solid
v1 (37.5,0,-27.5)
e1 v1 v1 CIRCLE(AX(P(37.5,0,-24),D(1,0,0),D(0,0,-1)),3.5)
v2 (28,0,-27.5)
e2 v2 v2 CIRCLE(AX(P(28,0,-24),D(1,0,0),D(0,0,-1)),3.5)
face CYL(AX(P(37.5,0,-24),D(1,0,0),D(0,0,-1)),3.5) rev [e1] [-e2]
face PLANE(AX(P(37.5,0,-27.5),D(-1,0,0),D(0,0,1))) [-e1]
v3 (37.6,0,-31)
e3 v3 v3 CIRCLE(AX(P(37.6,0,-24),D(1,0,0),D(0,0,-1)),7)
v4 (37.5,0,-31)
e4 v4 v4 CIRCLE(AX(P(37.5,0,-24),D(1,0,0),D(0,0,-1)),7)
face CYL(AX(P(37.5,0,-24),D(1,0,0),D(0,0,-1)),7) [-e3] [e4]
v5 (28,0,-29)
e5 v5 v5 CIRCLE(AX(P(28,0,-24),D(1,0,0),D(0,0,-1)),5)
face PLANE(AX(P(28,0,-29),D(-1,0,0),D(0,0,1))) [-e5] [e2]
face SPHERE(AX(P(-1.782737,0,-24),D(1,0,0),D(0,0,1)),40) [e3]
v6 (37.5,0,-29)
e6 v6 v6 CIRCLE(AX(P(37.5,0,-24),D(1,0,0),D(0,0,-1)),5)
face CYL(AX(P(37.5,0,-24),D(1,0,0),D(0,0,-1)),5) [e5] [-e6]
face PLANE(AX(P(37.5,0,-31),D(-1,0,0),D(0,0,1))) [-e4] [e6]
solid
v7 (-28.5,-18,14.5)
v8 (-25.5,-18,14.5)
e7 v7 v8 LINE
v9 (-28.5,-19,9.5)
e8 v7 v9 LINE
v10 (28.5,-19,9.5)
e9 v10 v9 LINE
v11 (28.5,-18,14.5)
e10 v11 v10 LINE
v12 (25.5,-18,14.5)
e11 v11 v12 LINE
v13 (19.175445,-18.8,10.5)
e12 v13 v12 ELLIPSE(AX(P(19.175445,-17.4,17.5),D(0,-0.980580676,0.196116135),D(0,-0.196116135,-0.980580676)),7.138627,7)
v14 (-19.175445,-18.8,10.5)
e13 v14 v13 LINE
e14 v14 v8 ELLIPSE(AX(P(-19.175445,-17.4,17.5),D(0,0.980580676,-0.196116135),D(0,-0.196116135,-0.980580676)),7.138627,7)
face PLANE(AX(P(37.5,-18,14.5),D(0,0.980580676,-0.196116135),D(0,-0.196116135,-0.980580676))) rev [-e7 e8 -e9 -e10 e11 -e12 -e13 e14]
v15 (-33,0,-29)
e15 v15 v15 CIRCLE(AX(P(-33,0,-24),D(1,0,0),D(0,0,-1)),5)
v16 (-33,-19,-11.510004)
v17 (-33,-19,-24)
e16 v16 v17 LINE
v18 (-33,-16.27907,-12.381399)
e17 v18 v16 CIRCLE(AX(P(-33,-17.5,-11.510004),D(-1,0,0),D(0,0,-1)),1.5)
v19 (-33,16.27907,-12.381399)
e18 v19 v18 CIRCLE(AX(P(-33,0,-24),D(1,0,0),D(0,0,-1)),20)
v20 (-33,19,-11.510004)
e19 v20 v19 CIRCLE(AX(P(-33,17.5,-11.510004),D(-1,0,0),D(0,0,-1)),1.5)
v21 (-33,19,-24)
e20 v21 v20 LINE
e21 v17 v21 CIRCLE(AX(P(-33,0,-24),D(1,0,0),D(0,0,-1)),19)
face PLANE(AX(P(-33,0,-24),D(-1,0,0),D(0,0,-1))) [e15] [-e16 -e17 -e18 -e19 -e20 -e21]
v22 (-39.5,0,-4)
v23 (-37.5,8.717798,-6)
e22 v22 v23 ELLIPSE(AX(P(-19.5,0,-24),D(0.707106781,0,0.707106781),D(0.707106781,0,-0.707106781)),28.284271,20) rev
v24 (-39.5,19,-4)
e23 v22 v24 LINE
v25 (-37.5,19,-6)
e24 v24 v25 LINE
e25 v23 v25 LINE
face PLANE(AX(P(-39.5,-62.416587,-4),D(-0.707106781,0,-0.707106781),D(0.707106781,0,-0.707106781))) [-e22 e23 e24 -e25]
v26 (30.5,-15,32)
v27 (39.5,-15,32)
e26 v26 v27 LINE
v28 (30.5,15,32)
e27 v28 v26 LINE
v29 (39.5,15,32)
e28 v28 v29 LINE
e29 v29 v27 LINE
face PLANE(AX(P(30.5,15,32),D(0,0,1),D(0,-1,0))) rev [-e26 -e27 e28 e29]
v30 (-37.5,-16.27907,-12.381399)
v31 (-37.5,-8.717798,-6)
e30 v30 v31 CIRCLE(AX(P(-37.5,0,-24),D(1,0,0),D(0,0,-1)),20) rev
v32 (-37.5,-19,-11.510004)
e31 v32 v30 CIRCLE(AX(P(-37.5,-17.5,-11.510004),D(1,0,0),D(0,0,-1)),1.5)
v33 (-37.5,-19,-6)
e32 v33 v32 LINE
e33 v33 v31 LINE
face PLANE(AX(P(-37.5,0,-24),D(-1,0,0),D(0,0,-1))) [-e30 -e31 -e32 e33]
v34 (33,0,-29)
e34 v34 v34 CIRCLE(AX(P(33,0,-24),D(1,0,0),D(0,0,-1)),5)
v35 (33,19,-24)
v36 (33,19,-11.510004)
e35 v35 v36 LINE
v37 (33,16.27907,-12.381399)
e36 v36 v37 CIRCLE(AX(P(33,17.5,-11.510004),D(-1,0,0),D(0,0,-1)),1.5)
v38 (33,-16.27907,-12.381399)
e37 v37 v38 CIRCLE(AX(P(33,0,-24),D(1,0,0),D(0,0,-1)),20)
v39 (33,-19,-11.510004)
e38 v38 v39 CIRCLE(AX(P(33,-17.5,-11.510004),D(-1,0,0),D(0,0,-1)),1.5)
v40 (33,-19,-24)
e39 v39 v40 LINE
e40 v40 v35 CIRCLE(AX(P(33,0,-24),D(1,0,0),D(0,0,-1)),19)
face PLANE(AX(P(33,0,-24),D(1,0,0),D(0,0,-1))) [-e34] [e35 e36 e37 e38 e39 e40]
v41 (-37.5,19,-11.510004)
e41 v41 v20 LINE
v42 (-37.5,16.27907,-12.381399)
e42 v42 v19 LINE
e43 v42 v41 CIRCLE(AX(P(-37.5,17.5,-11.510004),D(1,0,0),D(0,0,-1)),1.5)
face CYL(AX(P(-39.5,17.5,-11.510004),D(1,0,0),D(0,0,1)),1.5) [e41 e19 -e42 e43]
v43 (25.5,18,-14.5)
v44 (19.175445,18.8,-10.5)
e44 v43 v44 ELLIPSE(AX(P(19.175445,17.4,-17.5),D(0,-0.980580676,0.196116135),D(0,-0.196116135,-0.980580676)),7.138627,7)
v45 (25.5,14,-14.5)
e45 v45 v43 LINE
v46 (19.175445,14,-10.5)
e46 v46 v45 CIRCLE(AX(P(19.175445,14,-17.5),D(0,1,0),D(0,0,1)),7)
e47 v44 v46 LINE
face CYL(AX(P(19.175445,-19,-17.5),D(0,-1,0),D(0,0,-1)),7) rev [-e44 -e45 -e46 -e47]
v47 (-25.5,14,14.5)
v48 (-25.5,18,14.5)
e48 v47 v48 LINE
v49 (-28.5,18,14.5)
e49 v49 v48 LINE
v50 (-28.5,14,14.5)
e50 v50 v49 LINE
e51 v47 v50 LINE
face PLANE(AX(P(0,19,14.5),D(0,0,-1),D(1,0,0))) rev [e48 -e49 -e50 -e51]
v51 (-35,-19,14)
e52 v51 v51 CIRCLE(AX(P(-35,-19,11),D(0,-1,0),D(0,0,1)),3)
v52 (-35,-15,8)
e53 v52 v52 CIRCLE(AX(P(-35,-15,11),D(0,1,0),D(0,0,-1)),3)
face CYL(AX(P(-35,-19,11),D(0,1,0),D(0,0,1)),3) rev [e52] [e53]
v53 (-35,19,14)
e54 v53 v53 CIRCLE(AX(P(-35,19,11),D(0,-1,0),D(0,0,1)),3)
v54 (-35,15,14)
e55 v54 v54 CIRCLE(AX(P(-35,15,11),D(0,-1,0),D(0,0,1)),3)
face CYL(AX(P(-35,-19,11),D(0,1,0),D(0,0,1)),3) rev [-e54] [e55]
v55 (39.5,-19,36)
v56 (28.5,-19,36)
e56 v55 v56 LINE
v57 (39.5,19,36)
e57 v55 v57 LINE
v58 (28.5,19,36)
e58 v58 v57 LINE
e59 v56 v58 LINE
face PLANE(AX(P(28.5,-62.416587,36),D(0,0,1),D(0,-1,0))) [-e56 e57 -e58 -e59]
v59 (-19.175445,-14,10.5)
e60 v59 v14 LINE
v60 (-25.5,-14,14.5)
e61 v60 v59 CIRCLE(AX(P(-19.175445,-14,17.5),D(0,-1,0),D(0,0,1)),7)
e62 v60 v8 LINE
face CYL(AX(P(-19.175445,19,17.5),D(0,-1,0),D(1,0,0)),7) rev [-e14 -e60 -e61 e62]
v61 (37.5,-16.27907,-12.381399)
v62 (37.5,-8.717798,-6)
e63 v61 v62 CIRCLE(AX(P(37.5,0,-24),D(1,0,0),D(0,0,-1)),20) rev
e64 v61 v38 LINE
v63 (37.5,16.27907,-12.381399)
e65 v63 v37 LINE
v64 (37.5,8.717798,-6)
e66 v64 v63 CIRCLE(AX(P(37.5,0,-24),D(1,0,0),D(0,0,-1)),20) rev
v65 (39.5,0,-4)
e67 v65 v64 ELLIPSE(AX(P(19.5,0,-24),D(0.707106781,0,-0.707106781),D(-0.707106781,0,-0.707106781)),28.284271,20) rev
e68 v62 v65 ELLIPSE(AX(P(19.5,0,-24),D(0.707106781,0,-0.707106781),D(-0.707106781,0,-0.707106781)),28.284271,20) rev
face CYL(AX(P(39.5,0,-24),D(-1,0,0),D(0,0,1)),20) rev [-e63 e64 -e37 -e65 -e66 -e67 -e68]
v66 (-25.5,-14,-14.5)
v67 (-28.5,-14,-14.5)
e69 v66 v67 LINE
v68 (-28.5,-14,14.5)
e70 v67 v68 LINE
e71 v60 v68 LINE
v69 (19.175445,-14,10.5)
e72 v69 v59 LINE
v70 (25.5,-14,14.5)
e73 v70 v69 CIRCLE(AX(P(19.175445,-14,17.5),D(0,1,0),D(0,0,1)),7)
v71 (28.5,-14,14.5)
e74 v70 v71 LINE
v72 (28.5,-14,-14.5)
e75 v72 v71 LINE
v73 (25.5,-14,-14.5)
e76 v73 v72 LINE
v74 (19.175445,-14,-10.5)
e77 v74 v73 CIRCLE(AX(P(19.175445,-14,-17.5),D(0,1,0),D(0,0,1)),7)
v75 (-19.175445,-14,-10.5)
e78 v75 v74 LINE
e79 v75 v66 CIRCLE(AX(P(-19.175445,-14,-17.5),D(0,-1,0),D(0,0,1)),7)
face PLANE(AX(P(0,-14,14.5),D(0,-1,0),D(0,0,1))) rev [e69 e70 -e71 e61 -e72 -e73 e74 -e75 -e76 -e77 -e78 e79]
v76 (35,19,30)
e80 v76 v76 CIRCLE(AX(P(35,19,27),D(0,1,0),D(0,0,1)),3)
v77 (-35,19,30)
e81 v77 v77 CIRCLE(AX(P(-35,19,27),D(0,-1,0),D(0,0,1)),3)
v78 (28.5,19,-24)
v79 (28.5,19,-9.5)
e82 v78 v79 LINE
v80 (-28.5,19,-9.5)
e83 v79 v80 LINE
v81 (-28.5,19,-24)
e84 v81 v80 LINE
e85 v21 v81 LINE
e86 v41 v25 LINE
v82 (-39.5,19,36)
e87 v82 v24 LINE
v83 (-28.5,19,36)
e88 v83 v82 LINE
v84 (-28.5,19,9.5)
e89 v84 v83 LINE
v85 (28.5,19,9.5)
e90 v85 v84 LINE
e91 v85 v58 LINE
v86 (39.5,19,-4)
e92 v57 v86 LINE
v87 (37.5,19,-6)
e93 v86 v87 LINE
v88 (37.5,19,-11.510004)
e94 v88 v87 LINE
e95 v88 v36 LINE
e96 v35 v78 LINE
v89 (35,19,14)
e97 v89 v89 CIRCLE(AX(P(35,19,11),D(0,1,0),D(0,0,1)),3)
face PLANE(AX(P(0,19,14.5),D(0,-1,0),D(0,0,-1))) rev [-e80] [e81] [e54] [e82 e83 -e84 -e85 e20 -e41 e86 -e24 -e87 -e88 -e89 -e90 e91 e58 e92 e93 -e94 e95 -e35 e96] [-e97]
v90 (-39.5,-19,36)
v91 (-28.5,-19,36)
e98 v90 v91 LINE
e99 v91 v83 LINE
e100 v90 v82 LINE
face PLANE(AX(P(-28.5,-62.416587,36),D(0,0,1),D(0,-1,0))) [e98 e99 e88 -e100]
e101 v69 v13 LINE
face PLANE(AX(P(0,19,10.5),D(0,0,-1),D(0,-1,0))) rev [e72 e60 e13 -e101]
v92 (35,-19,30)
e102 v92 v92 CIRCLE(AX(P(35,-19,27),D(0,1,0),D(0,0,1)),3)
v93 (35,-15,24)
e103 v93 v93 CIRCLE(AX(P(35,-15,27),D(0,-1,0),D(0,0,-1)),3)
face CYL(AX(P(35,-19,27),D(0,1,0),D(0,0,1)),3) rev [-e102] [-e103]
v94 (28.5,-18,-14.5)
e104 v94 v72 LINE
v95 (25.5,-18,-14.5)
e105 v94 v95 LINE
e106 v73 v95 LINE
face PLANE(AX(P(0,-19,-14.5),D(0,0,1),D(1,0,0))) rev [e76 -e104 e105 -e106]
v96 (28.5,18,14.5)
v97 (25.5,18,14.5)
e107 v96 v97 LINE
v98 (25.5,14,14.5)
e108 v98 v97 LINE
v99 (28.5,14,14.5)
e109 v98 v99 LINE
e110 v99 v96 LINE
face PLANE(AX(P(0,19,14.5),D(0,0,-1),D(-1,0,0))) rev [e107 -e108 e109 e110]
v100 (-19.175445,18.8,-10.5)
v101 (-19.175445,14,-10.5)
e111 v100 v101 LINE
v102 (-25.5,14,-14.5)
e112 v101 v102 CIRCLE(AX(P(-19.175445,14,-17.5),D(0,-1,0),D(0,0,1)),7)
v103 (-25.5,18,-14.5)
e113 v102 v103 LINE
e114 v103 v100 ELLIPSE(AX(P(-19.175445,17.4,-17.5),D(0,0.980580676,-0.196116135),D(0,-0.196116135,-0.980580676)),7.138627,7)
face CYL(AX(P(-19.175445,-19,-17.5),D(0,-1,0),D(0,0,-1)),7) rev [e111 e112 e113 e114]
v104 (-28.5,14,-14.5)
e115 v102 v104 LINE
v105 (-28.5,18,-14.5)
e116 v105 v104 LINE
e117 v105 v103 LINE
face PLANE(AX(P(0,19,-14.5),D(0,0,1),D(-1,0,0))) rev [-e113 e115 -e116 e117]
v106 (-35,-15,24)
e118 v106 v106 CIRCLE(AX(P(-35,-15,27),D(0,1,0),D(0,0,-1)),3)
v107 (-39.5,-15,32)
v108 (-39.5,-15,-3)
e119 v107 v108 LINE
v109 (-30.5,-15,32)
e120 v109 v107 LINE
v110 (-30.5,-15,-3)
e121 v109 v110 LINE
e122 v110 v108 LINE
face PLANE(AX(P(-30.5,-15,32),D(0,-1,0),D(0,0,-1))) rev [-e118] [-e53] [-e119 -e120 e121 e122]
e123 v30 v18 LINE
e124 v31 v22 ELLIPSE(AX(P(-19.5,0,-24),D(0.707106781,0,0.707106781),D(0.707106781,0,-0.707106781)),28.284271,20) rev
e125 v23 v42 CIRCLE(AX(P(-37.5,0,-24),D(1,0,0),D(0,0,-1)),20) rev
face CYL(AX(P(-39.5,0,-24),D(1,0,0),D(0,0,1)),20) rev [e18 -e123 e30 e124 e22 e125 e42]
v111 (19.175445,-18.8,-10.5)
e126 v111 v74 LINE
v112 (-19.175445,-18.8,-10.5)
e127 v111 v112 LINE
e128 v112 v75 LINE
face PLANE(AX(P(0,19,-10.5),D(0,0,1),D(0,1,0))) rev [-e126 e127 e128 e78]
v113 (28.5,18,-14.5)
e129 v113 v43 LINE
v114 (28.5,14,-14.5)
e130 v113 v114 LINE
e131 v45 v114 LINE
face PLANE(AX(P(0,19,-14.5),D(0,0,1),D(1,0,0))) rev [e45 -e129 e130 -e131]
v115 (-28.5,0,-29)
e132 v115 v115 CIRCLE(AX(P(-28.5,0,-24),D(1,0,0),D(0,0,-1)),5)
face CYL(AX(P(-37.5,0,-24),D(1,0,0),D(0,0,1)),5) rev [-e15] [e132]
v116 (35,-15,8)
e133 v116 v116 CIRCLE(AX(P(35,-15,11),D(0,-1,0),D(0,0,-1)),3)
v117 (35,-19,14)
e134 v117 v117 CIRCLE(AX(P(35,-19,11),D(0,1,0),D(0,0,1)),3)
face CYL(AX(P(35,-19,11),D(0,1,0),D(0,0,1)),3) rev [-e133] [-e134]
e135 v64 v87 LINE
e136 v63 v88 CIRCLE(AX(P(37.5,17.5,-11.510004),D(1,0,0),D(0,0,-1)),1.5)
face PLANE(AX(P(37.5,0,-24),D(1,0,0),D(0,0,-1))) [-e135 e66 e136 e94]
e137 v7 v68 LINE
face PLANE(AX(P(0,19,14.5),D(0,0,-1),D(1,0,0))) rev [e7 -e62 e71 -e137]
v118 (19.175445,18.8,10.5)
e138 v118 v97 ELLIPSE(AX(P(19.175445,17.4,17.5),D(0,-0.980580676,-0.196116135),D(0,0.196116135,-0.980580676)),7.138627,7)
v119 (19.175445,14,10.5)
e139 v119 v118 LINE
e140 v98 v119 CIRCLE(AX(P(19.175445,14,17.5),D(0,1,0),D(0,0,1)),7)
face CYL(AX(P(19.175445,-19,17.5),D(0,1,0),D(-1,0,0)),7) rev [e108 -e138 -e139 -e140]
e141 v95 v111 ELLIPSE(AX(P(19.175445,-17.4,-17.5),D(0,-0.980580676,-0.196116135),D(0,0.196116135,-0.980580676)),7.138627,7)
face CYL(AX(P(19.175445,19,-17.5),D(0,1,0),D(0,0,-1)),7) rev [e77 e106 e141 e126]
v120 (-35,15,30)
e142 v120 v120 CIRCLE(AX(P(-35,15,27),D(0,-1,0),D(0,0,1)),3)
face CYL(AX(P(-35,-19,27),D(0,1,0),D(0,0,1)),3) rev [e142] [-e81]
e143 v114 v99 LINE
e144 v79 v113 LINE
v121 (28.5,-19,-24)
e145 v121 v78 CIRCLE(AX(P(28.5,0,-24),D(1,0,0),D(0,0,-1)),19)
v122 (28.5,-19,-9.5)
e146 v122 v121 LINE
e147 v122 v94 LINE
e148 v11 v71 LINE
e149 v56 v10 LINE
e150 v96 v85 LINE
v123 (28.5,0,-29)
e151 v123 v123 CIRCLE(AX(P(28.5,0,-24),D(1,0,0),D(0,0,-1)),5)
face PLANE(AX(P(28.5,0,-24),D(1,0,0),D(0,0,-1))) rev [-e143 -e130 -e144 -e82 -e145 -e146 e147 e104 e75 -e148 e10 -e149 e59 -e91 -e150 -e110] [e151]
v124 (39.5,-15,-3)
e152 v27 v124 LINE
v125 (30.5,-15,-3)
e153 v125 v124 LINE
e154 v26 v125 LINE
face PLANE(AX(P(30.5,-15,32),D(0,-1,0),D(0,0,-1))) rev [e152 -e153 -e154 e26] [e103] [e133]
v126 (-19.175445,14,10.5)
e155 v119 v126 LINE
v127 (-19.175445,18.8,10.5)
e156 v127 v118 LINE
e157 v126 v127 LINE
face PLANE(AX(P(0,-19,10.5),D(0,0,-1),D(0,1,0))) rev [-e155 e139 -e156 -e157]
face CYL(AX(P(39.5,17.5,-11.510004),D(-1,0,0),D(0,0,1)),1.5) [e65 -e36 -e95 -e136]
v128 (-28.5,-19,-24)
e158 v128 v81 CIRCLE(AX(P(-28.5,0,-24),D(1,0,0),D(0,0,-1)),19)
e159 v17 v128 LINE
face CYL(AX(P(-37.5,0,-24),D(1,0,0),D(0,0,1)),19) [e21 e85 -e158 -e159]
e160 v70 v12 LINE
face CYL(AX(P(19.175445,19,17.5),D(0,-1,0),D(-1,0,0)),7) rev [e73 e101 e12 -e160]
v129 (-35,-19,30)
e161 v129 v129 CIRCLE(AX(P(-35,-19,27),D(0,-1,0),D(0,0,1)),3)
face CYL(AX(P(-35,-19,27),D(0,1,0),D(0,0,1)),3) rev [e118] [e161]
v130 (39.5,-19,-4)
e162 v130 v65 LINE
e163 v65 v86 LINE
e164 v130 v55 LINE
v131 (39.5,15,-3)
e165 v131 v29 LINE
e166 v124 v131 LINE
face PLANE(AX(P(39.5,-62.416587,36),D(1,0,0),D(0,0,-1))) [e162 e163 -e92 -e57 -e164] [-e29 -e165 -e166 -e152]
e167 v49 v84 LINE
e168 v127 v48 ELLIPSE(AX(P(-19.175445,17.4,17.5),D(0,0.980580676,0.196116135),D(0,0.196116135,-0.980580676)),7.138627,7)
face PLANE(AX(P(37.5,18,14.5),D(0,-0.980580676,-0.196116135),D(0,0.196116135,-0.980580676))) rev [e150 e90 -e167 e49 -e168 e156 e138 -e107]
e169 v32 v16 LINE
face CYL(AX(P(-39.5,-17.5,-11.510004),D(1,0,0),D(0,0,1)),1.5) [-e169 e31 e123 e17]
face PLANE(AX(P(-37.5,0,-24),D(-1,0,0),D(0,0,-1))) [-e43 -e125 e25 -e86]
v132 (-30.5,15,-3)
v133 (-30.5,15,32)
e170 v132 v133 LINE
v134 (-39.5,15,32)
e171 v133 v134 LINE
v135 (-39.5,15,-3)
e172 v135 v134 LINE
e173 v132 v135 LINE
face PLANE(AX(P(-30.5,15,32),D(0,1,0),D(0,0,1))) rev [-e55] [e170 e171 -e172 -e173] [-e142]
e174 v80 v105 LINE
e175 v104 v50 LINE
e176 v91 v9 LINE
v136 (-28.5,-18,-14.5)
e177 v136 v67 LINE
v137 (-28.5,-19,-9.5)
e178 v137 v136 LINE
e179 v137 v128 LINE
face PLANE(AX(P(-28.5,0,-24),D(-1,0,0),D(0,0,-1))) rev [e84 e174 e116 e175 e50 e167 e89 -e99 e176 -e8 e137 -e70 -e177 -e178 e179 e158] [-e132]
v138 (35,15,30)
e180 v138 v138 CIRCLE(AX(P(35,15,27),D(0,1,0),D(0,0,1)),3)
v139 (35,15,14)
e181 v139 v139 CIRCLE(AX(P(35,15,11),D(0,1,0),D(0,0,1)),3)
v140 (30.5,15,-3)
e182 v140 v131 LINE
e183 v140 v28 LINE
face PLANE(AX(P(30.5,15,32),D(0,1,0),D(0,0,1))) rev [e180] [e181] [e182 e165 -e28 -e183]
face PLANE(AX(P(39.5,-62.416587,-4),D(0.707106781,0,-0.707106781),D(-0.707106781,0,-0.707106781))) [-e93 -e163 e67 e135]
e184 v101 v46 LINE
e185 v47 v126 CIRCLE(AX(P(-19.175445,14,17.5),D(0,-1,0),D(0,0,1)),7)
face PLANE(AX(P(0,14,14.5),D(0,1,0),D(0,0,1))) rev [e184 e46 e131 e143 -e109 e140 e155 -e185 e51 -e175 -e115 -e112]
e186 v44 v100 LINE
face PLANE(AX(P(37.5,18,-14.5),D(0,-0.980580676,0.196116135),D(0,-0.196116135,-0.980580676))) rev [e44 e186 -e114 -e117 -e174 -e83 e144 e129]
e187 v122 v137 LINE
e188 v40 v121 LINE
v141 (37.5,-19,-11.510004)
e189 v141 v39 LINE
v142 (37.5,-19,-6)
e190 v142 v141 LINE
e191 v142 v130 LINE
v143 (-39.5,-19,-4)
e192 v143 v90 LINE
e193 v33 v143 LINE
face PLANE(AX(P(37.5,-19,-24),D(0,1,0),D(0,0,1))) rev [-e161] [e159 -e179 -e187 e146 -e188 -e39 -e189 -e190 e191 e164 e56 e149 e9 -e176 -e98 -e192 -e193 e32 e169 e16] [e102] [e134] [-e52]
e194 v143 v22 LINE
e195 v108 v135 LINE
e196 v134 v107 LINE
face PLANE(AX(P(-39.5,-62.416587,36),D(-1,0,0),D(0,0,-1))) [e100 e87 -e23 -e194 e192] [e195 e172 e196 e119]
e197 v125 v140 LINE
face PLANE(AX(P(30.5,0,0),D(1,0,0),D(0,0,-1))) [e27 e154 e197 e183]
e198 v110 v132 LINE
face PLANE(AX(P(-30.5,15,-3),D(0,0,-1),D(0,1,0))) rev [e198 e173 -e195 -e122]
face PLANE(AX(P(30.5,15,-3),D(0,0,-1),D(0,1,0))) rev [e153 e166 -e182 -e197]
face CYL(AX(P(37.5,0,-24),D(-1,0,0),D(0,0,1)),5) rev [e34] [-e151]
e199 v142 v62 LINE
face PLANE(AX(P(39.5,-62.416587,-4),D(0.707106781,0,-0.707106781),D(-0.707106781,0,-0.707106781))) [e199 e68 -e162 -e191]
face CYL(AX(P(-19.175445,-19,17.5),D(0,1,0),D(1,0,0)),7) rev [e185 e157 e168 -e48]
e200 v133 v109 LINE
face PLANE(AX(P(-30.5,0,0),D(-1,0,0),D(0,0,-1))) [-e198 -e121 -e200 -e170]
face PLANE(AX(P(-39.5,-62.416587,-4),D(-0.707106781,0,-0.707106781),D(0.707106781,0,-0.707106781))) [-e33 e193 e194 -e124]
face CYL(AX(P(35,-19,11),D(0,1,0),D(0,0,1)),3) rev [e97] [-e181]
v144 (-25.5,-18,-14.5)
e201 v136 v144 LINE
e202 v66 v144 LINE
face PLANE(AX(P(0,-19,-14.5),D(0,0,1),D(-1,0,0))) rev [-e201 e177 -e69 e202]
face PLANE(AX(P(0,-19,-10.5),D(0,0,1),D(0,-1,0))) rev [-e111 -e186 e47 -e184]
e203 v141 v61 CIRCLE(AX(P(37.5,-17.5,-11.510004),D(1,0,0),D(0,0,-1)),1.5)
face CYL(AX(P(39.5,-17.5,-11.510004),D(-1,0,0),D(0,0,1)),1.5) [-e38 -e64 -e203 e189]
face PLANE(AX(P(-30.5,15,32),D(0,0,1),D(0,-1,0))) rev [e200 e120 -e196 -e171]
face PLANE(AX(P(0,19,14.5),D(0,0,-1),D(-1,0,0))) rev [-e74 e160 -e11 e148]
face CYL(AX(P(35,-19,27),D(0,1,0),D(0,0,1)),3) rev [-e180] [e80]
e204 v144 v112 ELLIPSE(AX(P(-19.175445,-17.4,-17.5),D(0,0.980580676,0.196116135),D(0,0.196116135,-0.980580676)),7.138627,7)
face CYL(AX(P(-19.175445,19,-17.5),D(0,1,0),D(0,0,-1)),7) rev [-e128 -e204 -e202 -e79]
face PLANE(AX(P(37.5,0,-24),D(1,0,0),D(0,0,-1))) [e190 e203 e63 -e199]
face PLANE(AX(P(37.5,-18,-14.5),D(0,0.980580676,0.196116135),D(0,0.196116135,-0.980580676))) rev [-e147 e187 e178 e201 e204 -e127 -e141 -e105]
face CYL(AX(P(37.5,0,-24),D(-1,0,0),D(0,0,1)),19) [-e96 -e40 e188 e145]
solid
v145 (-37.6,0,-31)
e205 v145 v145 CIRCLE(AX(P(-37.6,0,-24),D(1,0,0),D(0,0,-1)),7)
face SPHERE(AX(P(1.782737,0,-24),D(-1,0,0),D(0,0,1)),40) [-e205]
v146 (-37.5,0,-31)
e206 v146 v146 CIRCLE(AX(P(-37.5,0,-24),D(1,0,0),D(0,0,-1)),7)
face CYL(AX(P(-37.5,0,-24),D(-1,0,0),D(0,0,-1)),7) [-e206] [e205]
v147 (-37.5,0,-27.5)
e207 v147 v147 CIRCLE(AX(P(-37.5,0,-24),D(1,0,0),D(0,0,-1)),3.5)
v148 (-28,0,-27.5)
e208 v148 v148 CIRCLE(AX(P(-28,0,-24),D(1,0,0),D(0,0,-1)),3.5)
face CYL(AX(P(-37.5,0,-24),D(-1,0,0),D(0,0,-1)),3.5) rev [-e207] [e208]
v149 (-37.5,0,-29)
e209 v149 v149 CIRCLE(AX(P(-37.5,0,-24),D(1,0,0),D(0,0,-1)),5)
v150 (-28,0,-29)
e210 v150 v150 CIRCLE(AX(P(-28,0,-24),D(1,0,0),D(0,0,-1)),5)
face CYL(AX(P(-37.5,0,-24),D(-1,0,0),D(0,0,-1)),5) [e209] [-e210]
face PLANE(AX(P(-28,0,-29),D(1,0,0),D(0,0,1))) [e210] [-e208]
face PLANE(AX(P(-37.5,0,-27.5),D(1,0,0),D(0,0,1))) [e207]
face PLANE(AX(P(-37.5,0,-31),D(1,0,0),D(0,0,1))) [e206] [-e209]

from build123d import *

# Parameters (mm, degrees)
BOSS_EXTRUDE1_START     = 28.5
BOSS_EXTRUDE1_DEPTH     = 9
CUT_EXTRUDE1_DEPTH      = 4.5
SKETCH3_R               = 5
CUT_EXTRUDE2_DEPTH      = 48.22552276
CIRPATTERN1_START       = 28.5
CIRPATTERN1_DEPTH       = 4.5
CIRPATTERN1_START_2     = 33
CIRPATTERN1_2_OUTLINE_R = 5
CIRPATTERN1_2_DEPTH     = 4.5
SKETCH4_W               = 29
SKETCH4_H               = 5
BOSS_EXTRUDE2_DEPTH     = 28.5
CUT_EXTRUDE3_DEPTH      = 61.135264197
SKETCH6_W               = 25.5
SKETCH6_H               = 4
CUT_EXTRUDE4_DEPTH      = 69.551075849
FILLET1_R               = 7
CUT_EXTRUDE5_DEPTH      = 69.946059827
BOSS_EXTRUDE3_DEPTH     = 38
SKETCH10_W              = 35
SKETCH10_H              = 30
CUT_EXTRUDE7_DEPTH      = 9
SKETCH11_R              = 3
CUT_EXTRUDE8_DEPTH      = 70.665271118
SKETCH14_R              = 5
BOSS_EXTRUDE4_DEPTH     = 4.5
CUT_EXTRUDE9_DEPTH      = 90.124092509
CUT_EXTRUDE9_DEPTH_BACK = 4.5
SKETCH12_R              = 5


# Read off the part's stored shape, not the designer's step: CirPattern1
with BuildPart() as part:
    # Sketch1 → Boss-Extrude1 (new body)
    with BuildSketch(Plane(origin=(0, 0, 0), x_dir=(0, 0, -1), z_dir=(1, 0, 0)).offset(BOSS_EXTRUDE1_START)):
        with BuildLine():
            Line((24, -19), (-24, -19))
            ThreePointArc((-24, -19), (-43, 0), (-24, 19))
            Line((-24, 19), (24, 19))
            ThreePointArc((24, 19), (43, 0), (24, -19))
        make_face()
    extrude(amount=BOSS_EXTRUDE1_DEPTH)

    # Sketch2 → Cut-Extrude1 (cut)
    with BuildSketch(Plane(origin=(37.5, 0, 0), x_dir=(0, 0, -1), z_dir=(1, 0, 0))):
        with BuildLine():
            Line((-11.510004003, -19), (24, -19))
            Line((24, -19), (24, -42.915105585))
            Line((24, -42.915105585), (-69.339300191, -42.915105585))
            Line((-69.339300191, -42.915105585), (-69.339300191, 41.365624017))
            Line((-69.339300191, 41.365624017), (24, 41.365624017))
            Line((24, 41.365624017), (24, 19))
            Line((24, 19), (-11.510004003, 19))
            ThreePointArc((-11.510004003, 19), (-12.938533903, 17.957495711), (-12.381399073, 16.279069767))
            ThreePointArc((-12.381399073, 16.279069767), (-4, 0), (-12.381399073, -16.279069767))
            ThreePointArc((-12.381399073, -16.279069767), (-12.938533903, -17.957495711), (-11.510004003, -19))
        make_face()
    extrude(amount=-CUT_EXTRUDE1_DEPTH, mode=Mode.SUBTRACT)

    # Sketch3 → Cut-Extrude2 (cut, through all)
    with BuildSketch(Plane(origin=(33, 0, 0), x_dir=(0, 0, -1), z_dir=(1, 0, 0))):
        with Locations((-24, 0)):
            Circle(SKETCH3_R)
    extrude(amount=-CUT_EXTRUDE2_DEPTH, mode=Mode.SUBTRACT)

    # CirPattern1 outline → CirPattern1 (cut)
    with BuildSketch(Plane.YZ.offset(CIRPATTERN1_START)):
        with BuildLine():
            ThreePointArc((16.279069767, -12.381399073), (0, -4), (-16.279069767, -12.381399073))
            ThreePointArc((-16.279069767, -12.381399073), (-17.957495711, -12.938533903), (-19, -11.510004003))
            Line((-19, -11.510004003), (-19, -24))
            ThreePointArc((-19, -24), (0, -43), (19, -24))
            Line((19, -24), (19, -11.510004003))
            ThreePointArc((19, -11.510004003), (17.957495711, -12.938533903), (16.279069767, -12.381399073))
        make_face()
    extrude(amount=CIRPATTERN1_DEPTH, mode=Mode.SUBTRACT)

    # CirPattern1 2 outline → CirPattern1 2 (cut)
    with BuildSketch(Plane.YZ.offset(CIRPATTERN1_START_2)):
        with Locations((0, -24)):
            Circle(CIRPATTERN1_2_OUTLINE_R)
    extrude(amount=CIRPATTERN1_2_DEPTH, mode=Mode.SUBTRACT)


with BuildPart() as body_2:
    # Sketch4 → Boss-Extrude2 (new body)
    with BuildSketch(Plane.ZY.offset(-28.5)):
        with Locations((0, 16.5)):
            Rectangle(SKETCH4_W, SKETCH4_H)
    extrude(amount=BOSS_EXTRUDE2_DEPTH)

    # Sketch5 → Cut-Extrude3 (cut, through all)
    with BuildSketch(Plane.ZY):
        Polygon((-9.5, 19), (-14.5, 19), (-14.5, 18), align=None)
        Polygon((14.5, 18), (9.5, 19), (14.5, 19), align=None)
    extrude(amount=-CUT_EXTRUDE3_DEPTH, mode=Mode.SUBTRACT)

    # Sketch6 → Cut-Extrude4 (cut, through all)
    with BuildSketch(Plane(origin=(0, 19, 0), x_dir=(1, 0, 0), z_dir=(0, 1, 0))):
        with Locations((12.75, 12.5)):
            Rectangle(SKETCH6_W, SKETCH6_H)
        with Locations((12.75, -12.5)):
            Rectangle(SKETCH6_W, SKETCH6_H)
    extrude(amount=-CUT_EXTRUDE4_DEPTH, mode=Mode.SUBTRACT)

    # Fillet1
    # the kernel refuses this fillet: 7 mm, written as the material it adds along each edge
    with BuildSketch(Plane(origin=(25.5, 34.611388301, -10.5), x_dir=(0, 0, -1), z_dir=(0, -1, 0))) as fillet1_piece_1_section:
        with BuildLine():
            CenterArc((7, -6.32455532), FILLET1_R, 115.376933525, 64.623066475)
            Line((0, -6.32455532), (-0.14, -6.32455532))
            Line((-0.14, -6.32455532), (-0.14, 0))
            Line((-0.14, 0), (0, 0.14))
            ThreePointArc((0, 0.14), (2, 0.14), (3.94, 0.126491106))
            Line((3.94, 0.126491106), (4, 0))
        make_face()
    fillet1_piece_1 = extrude(amount=20.611388301, mode=Mode.PRIVATE)
    fillet1_piece_1 = split(fillet1_piece_1, bisect_by=Plane(origin=(23.914802674, 18.512286415, -11.938567923), z_dir=(0, -0.9805806756909202, 0.1961161351381841)), keep=Keep.TOP, mode=Mode.PRIVATE)
    add(fillet1_piece_1)
    with BuildSketch(Plane(origin=(25.5, 34.611388301, 10.5), x_dir=(-1, 0, 0), z_dir=(0, -1, 0))) as fillet1_piece_2_section:
        with BuildLine():
            CenterArc((6.32455532, -7), FILLET1_R, 90, 64.623066475)
            Line((0, -4), (-0.126491106, -3.94))
            ThreePointArc((-0.126491106, -3.94), (-0.14, -2), (-0.14, 0))
            Line((-0.14, 0), (0, 0.14))
            Line((0, 0.14), (6.32455532, 0.14))
            Line((6.32455532, 0.14), (6.32455532, 0))
        make_face()
    fillet1_piece_2 = extrude(amount=20.611388301, mode=Mode.PRIVATE)
    fillet1_piece_2 = split(fillet1_piece_2, bisect_by=Plane(origin=(23.914802674, 18.512286415, 11.938567923), z_dir=(0, -0.9805806756909202, -0.1961161351381841)), keep=Keep.TOP, mode=Mode.PRIVATE)
    add(fillet1_piece_2)


with BuildPart() as body_3:
    # Mirror1: mirrored copy
    add(body_2.part.mirror(Plane.ZX))


with BuildPart() as body_2_1:
    add(body_2.part)

    # Combine1: union part, body 3
    add(part.part)
    add(body_3.part)

    # Mirror2: body 2 across plane


with BuildPart() as body_2_2:
    add(body_2_1.part)
    add(body_2_1.part.mirror(Plane(origin=(0, 0, 0), x_dir=(0, 0, 1), z_dir=(1, 0, 0))))

    # Sketch9 → Cut-Extrude5 (cut, through all)
    with BuildSketch(Plane(origin=(0, 19, 0), x_dir=(1, 0, 0), z_dir=(0, 1, 0))):
        Polygon((-50.684175345, 49.546643659), (0, 49.546643659), (0, -14.5), (47.40252606, -14.5), (47.40252606, -48.723397375), (0, -48.723397375), (-50.684175345, -48.723397375), align=None)
    extrude(amount=-CUT_EXTRUDE5_DEPTH, mode=Mode.SUBTRACT)

    # Sketch8 → Boss-Extrude3 (add)
    with BuildSketch(Plane(origin=(0, 19, 0), x_dir=(1, 0, 0), z_dir=(0, 1, 0))):
        Polygon((39.5, 4), (37.5, 6), (33.584622935, 6), (33.584622935, 3.307606204), (28.5, 3.307606204), (28.5, -36), (39.5, -36), align=None)
    extrude(amount=-BOSS_EXTRUDE3_DEPTH)

    # Sketch10 → Cut-Extrude7 (cut)
    with BuildSketch(Plane(origin=(39.5, 0, 0), x_dir=(0, 0, -1), z_dir=(1, 0, 0))):
        with Locations((-14.5, 0)):
            Rectangle(SKETCH10_W, SKETCH10_H)
    extrude(amount=-CUT_EXTRUDE7_DEPTH, mode=Mode.SUBTRACT)

    # Sketch11 → Cut-Extrude8 (cut, through all)
    with BuildSketch(Plane(origin=(0, 19, 0), x_dir=(1, 0, 0), z_dir=(0, 1, 0))):
        with Locations(Location((35, -27, 0), (0, 0, 270))):
            Circle(SKETCH11_R)
        with Locations(Location((35, -11, 0), (0, 0, 270))):
            Circle(SKETCH11_R)
    extrude(amount=-CUT_EXTRUDE8_DEPTH, mode=Mode.SUBTRACT)

    # Sketch14 → Boss-Extrude4 (add)
    with BuildSketch(Plane.ZY.offset(-33)):
        with BuildLine():
            Line((-24, -19), (-11.510004003, -19))
            ThreePointArc((-11.510004003, -19), (-12.938533903, -17.957495711), (-12.381399073, -16.279069767))
            ThreePointArc((-12.381399073, -16.279069767), (-4, 0), (-12.381399073, 16.279069767))
            ThreePointArc((-12.381399073, 16.279069767), (-12.938533903, 17.957495711), (-11.510004003, 19))
            Line((-11.510004003, 19), (-24, 19))
            ThreePointArc((-24, 19), (-43, 0), (-24, -19))
        make_face()
        with Locations(Location((-24, 0, 0), (0, 0, 180))):
            Circle(SKETCH14_R, mode=Mode.SUBTRACT)
    extrude(amount=BOSS_EXTRUDE4_DEPTH)

    # Sketch12 → Cut-Extrude9 (cut, two sides: drawn at the far end of the back side and taken through both)
    with BuildSketch(Plane(origin=(37.5, 0, 0), x_dir=(0, 0, -1), z_dir=(1, 0, 0)).offset(-CUT_EXTRUDE9_DEPTH_BACK)):
        with BuildLine():
            Line((11.510004003, -19), (24, -19))
            ThreePointArc((24, -19), (43, 0), (24, 19))
            Line((24, 19), (11.510004003, 19))
            ThreePointArc((11.510004003, 19), (12.938533903, 17.957495711), (12.381399073, 16.279069767))
            ThreePointArc((12.381399073, 16.279069767), (4, 0), (12.381399073, -16.279069767))
            ThreePointArc((12.381399073, -16.279069767), (12.938533903, -17.957495711), (11.510004003, -19))
        make_face()
        with Locations((24, 0)):
            Circle(SKETCH12_R, mode=Mode.SUBTRACT)
    extrude(amount=CUT_EXTRUDE9_DEPTH + CUT_EXTRUDE9_DEPTH_BACK, mode=Mode.SUBTRACT)

    # Mirror5: body 2 across plane


with BuildPart() as body_2_2_1:
    # Sketch7 → Revolve1 (revolve)
    with BuildSketch(Plane(origin=(0, 0, 0), x_dir=(1, 0, 0), z_dir=(0, 1, 0)), mode=Mode.PRIVATE) as revolve1_sk:
        with BuildLine():
            Line((37.6, 31), (37.5, 31))
            Line((37.5, 31), (37.5, 29))
            Line((37.5, 29), (28, 29))
            Line((28, 29), (28, 27.5))
            Line((28, 27.5), (37.5, 27.5))
            Line((37.5, 27.5), (37.5, 24))
            Line((37.5, 24), (38.217262665, 24))
            ThreePointArc((38.217262665, 24), (38.062648178, 27.513581264), (37.6, 31))
        make_face()
    revolve(revolve1_sk.sketch.rotate(Axis((37.5, 0, -24), (-1, 0, 0)), 180), axis=Axis((37.5, 0, -24), (-1, 0, 0)))


with BuildPart() as body_3_2:
    # Mirror4: mirrored copy
    add(body_2_2_1.part.mirror(Plane(origin=(0, 0, 0), x_dir=(0, 0, 1), z_dir=(1, 0, 0))))


with BuildPart() as body_2_3:
    add(body_2_2.part)
    add(body_2_2.part.mirror(Plane(origin=(0, -19, -49.546643659), x_dir=(0, 0, 1), z_dir=(1, 0, 0))))


solid = Compound([body_2_2_1.part, body_3_2.part, body_2_3.part])
